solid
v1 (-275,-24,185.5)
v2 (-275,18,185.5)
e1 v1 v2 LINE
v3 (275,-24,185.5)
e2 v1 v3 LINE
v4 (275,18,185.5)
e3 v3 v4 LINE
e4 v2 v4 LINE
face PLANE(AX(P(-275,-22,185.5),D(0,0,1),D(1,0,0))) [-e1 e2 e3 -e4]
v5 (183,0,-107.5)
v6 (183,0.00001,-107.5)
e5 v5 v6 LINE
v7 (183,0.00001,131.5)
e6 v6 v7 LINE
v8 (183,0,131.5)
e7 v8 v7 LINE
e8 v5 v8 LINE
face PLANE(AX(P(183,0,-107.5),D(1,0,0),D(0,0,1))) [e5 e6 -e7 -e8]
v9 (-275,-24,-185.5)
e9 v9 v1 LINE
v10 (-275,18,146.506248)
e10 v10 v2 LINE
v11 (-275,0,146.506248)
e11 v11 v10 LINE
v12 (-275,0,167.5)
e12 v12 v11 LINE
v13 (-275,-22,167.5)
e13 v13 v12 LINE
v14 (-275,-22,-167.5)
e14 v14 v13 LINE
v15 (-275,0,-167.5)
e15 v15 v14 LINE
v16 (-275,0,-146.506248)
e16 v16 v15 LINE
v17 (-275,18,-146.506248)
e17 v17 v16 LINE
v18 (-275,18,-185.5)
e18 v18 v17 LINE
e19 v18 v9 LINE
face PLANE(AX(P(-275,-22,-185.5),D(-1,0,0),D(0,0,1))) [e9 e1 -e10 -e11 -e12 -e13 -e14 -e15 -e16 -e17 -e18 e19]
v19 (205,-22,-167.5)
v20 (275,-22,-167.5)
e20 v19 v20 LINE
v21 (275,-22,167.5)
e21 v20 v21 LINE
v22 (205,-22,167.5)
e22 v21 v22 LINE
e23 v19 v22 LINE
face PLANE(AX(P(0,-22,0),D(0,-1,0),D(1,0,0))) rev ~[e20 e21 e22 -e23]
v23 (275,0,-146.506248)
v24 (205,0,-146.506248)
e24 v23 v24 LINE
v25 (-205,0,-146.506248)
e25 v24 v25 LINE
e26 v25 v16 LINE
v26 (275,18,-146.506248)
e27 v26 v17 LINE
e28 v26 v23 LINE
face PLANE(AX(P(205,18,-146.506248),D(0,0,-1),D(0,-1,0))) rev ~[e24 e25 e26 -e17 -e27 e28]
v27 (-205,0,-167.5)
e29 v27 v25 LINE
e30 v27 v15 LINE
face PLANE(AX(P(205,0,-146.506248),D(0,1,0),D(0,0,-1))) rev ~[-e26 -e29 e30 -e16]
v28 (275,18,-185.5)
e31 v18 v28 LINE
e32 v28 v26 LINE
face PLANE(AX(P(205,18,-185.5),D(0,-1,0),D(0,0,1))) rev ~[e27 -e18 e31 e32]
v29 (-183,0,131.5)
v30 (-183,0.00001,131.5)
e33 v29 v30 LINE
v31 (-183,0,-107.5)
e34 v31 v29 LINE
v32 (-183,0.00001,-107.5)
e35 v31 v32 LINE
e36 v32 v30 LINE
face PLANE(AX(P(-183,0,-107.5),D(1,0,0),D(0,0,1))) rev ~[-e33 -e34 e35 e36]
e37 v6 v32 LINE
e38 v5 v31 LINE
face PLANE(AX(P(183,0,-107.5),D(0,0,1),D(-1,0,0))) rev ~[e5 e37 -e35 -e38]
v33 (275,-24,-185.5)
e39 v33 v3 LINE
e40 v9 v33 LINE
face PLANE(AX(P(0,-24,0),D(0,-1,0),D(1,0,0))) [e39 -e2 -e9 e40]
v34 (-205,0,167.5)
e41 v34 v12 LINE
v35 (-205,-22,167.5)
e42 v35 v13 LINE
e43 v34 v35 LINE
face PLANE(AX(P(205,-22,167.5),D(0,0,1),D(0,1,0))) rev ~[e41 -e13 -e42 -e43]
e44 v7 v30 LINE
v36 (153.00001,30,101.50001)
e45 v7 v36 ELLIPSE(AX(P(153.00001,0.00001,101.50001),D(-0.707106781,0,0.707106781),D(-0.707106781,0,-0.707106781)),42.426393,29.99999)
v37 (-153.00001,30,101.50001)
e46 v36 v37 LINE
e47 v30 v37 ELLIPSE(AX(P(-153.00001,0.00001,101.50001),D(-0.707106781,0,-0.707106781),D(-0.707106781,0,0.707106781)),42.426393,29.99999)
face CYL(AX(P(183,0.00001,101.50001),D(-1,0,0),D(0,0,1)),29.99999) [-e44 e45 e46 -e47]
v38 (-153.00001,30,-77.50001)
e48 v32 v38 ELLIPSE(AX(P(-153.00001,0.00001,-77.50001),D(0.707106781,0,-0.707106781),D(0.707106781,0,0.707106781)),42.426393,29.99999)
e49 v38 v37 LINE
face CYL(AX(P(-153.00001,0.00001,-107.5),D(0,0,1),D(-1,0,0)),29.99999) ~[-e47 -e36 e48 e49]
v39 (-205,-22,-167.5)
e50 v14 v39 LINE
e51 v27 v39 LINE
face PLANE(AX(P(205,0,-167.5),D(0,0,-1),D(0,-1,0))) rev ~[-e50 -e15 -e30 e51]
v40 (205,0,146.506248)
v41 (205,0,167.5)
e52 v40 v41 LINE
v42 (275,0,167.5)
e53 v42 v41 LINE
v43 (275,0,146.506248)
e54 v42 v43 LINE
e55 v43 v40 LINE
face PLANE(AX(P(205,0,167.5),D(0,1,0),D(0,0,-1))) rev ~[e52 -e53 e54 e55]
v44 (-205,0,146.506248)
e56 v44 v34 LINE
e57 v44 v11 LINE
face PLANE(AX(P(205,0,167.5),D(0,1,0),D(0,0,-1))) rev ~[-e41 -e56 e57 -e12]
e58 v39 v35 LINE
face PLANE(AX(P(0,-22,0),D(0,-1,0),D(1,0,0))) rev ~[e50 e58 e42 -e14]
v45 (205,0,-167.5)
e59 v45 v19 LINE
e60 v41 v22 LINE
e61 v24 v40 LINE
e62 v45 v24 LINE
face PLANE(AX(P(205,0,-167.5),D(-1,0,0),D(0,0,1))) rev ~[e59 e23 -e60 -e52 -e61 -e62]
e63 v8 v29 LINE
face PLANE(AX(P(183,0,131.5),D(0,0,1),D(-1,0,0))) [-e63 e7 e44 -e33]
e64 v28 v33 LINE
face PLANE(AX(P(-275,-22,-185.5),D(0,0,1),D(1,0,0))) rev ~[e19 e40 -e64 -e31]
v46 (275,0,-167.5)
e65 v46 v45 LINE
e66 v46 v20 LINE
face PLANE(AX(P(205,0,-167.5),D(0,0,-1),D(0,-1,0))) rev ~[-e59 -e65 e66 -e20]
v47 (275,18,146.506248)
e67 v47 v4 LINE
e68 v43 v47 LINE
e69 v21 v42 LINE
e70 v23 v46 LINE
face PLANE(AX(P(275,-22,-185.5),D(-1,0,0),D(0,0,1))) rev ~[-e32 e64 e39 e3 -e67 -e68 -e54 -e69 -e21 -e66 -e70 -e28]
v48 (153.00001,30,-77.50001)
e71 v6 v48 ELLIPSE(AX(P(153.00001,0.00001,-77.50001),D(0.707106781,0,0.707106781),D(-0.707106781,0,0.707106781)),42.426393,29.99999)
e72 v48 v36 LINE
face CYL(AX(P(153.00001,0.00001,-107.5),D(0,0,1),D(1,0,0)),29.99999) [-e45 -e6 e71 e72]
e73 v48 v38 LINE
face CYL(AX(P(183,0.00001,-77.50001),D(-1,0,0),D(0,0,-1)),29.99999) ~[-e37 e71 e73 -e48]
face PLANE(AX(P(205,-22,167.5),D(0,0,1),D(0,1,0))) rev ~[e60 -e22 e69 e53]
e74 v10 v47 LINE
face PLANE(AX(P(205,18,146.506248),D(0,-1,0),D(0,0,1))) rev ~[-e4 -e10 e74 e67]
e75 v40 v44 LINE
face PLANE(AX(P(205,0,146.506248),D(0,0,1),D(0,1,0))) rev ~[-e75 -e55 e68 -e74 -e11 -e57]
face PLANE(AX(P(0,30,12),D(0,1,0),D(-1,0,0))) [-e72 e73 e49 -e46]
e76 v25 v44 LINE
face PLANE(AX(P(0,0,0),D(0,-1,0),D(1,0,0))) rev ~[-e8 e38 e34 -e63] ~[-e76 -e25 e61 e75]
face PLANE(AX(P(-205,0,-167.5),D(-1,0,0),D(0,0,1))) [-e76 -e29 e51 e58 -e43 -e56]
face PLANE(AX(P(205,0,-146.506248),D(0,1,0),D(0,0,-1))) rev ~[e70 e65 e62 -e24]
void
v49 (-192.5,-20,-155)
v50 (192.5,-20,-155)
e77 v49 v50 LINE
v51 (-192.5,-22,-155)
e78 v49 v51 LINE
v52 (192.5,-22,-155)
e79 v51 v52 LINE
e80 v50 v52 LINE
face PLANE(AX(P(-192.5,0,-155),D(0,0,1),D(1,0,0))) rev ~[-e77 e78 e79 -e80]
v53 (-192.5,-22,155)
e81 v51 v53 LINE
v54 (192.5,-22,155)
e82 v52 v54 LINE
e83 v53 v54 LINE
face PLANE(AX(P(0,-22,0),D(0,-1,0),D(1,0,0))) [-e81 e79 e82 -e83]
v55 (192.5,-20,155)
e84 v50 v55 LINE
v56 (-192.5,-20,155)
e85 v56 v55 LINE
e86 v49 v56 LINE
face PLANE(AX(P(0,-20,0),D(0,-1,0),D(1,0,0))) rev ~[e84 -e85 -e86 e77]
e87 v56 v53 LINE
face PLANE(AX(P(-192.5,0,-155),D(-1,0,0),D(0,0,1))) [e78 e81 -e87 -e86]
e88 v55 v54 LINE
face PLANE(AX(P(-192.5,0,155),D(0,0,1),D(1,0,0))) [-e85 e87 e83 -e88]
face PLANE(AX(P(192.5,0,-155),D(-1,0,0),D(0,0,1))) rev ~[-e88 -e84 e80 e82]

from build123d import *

# Parameters (mm, degrees)
F0_W          = 410
F0_H          = 335
F0_W_2        = 385
F0_H_2        = 310
F1_DEPTH      = 22
F2_DEPTH      = 20
F4_DEPTH      = 480
F4_DEPTH_BACK = 70
F5_W          = 366
F5_H          = 239
F6_DEPTH      = 30
F7_R          = 29.99999
F9_W          = 550
F9_H          = 371
F10_DEPTH     = 2


# Not quite as in the source:
# - a fillet or chamfer is up to 0.001 mm smaller than in the source, because OpenCascade refuses the exact size


with BuildPart() as f1:
    # F0 (on Front) → F1 (new body)
    with BuildSketch(Plane.XZ):
        Rectangle(F0_W, F0_H)
        Rectangle(F0_W_2, F0_H_2, mode=Mode.SUBTRACT)
    extrude(amount=F1_DEPTH)

    # F0 (on Front) → F2 (join)
    with BuildSketch(Plane.XZ):
        Rectangle(F0_W_2, F0_H_2)
    extrude(amount=F2_DEPTH)

    # F5 (on face) → F6 (join)
    with BuildSketch(Plane(origin=(0, 0, 0), x_dir=(-1, 0, 0), z_dir=(0, 1, 0))):
        with Locations((0, 12)):
            Rectangle(F5_W, F5_H)
    extrude(amount=F6_DEPTH)

    # F7 (radius 30 in the source; OpenCascade refuses exactly that, so slightly less here)
    f7_edges = [f1.edges().sort_by_distance(p)[0] for p in [
        (-183, 30, 12),
        (0, 30, 131.5),
        (183, 30, 12),
        (0, 30, -107.5),
    ]]
    fillet(f7_edges, radius=F7_R)


with BuildPart() as f4:
    # F3 (on face) → F4 (new body, two sides)
    with BuildSketch(Plane.YZ.offset(205)) as f4_sk:
        Polygon((0, -167.5), (-22, -167.5), (-22, -185.5), (18, -185.5), (18, -146.5062479338), (0, -146.5062479338), align=None)
    extrude(amount=-F4_DEPTH)
    extrude(f4_sk.sketch, amount=F4_DEPTH_BACK)


with BuildPart() as f4b:
    # F3 (on face) → F4, piece 2 (new body, two sides)
    with BuildSketch(Plane.YZ.offset(205)) as f4_2_sk:
        Polygon((0, 146.5062479338), (18, 146.5062479338), (18, 185.5), (-22, 185.5), (-22, 167.5), (0, 167.5), align=None)
    extrude(amount=-F4_DEPTH)
    extrude(f4_2_sk.sketch, amount=F4_DEPTH_BACK)


with BuildPart() as f4_1:
    add(f4.part)

    # F8: union F4b, F1
    add(f4b.part)
    add(f1.part)

    # F9 (on face) → F10 (join)
    with BuildSketch(Plane.XZ.offset(22)):
        Rectangle(F9_W, F9_H)
    extrude(amount=F10_DEPTH)


solid = f4_1.part
